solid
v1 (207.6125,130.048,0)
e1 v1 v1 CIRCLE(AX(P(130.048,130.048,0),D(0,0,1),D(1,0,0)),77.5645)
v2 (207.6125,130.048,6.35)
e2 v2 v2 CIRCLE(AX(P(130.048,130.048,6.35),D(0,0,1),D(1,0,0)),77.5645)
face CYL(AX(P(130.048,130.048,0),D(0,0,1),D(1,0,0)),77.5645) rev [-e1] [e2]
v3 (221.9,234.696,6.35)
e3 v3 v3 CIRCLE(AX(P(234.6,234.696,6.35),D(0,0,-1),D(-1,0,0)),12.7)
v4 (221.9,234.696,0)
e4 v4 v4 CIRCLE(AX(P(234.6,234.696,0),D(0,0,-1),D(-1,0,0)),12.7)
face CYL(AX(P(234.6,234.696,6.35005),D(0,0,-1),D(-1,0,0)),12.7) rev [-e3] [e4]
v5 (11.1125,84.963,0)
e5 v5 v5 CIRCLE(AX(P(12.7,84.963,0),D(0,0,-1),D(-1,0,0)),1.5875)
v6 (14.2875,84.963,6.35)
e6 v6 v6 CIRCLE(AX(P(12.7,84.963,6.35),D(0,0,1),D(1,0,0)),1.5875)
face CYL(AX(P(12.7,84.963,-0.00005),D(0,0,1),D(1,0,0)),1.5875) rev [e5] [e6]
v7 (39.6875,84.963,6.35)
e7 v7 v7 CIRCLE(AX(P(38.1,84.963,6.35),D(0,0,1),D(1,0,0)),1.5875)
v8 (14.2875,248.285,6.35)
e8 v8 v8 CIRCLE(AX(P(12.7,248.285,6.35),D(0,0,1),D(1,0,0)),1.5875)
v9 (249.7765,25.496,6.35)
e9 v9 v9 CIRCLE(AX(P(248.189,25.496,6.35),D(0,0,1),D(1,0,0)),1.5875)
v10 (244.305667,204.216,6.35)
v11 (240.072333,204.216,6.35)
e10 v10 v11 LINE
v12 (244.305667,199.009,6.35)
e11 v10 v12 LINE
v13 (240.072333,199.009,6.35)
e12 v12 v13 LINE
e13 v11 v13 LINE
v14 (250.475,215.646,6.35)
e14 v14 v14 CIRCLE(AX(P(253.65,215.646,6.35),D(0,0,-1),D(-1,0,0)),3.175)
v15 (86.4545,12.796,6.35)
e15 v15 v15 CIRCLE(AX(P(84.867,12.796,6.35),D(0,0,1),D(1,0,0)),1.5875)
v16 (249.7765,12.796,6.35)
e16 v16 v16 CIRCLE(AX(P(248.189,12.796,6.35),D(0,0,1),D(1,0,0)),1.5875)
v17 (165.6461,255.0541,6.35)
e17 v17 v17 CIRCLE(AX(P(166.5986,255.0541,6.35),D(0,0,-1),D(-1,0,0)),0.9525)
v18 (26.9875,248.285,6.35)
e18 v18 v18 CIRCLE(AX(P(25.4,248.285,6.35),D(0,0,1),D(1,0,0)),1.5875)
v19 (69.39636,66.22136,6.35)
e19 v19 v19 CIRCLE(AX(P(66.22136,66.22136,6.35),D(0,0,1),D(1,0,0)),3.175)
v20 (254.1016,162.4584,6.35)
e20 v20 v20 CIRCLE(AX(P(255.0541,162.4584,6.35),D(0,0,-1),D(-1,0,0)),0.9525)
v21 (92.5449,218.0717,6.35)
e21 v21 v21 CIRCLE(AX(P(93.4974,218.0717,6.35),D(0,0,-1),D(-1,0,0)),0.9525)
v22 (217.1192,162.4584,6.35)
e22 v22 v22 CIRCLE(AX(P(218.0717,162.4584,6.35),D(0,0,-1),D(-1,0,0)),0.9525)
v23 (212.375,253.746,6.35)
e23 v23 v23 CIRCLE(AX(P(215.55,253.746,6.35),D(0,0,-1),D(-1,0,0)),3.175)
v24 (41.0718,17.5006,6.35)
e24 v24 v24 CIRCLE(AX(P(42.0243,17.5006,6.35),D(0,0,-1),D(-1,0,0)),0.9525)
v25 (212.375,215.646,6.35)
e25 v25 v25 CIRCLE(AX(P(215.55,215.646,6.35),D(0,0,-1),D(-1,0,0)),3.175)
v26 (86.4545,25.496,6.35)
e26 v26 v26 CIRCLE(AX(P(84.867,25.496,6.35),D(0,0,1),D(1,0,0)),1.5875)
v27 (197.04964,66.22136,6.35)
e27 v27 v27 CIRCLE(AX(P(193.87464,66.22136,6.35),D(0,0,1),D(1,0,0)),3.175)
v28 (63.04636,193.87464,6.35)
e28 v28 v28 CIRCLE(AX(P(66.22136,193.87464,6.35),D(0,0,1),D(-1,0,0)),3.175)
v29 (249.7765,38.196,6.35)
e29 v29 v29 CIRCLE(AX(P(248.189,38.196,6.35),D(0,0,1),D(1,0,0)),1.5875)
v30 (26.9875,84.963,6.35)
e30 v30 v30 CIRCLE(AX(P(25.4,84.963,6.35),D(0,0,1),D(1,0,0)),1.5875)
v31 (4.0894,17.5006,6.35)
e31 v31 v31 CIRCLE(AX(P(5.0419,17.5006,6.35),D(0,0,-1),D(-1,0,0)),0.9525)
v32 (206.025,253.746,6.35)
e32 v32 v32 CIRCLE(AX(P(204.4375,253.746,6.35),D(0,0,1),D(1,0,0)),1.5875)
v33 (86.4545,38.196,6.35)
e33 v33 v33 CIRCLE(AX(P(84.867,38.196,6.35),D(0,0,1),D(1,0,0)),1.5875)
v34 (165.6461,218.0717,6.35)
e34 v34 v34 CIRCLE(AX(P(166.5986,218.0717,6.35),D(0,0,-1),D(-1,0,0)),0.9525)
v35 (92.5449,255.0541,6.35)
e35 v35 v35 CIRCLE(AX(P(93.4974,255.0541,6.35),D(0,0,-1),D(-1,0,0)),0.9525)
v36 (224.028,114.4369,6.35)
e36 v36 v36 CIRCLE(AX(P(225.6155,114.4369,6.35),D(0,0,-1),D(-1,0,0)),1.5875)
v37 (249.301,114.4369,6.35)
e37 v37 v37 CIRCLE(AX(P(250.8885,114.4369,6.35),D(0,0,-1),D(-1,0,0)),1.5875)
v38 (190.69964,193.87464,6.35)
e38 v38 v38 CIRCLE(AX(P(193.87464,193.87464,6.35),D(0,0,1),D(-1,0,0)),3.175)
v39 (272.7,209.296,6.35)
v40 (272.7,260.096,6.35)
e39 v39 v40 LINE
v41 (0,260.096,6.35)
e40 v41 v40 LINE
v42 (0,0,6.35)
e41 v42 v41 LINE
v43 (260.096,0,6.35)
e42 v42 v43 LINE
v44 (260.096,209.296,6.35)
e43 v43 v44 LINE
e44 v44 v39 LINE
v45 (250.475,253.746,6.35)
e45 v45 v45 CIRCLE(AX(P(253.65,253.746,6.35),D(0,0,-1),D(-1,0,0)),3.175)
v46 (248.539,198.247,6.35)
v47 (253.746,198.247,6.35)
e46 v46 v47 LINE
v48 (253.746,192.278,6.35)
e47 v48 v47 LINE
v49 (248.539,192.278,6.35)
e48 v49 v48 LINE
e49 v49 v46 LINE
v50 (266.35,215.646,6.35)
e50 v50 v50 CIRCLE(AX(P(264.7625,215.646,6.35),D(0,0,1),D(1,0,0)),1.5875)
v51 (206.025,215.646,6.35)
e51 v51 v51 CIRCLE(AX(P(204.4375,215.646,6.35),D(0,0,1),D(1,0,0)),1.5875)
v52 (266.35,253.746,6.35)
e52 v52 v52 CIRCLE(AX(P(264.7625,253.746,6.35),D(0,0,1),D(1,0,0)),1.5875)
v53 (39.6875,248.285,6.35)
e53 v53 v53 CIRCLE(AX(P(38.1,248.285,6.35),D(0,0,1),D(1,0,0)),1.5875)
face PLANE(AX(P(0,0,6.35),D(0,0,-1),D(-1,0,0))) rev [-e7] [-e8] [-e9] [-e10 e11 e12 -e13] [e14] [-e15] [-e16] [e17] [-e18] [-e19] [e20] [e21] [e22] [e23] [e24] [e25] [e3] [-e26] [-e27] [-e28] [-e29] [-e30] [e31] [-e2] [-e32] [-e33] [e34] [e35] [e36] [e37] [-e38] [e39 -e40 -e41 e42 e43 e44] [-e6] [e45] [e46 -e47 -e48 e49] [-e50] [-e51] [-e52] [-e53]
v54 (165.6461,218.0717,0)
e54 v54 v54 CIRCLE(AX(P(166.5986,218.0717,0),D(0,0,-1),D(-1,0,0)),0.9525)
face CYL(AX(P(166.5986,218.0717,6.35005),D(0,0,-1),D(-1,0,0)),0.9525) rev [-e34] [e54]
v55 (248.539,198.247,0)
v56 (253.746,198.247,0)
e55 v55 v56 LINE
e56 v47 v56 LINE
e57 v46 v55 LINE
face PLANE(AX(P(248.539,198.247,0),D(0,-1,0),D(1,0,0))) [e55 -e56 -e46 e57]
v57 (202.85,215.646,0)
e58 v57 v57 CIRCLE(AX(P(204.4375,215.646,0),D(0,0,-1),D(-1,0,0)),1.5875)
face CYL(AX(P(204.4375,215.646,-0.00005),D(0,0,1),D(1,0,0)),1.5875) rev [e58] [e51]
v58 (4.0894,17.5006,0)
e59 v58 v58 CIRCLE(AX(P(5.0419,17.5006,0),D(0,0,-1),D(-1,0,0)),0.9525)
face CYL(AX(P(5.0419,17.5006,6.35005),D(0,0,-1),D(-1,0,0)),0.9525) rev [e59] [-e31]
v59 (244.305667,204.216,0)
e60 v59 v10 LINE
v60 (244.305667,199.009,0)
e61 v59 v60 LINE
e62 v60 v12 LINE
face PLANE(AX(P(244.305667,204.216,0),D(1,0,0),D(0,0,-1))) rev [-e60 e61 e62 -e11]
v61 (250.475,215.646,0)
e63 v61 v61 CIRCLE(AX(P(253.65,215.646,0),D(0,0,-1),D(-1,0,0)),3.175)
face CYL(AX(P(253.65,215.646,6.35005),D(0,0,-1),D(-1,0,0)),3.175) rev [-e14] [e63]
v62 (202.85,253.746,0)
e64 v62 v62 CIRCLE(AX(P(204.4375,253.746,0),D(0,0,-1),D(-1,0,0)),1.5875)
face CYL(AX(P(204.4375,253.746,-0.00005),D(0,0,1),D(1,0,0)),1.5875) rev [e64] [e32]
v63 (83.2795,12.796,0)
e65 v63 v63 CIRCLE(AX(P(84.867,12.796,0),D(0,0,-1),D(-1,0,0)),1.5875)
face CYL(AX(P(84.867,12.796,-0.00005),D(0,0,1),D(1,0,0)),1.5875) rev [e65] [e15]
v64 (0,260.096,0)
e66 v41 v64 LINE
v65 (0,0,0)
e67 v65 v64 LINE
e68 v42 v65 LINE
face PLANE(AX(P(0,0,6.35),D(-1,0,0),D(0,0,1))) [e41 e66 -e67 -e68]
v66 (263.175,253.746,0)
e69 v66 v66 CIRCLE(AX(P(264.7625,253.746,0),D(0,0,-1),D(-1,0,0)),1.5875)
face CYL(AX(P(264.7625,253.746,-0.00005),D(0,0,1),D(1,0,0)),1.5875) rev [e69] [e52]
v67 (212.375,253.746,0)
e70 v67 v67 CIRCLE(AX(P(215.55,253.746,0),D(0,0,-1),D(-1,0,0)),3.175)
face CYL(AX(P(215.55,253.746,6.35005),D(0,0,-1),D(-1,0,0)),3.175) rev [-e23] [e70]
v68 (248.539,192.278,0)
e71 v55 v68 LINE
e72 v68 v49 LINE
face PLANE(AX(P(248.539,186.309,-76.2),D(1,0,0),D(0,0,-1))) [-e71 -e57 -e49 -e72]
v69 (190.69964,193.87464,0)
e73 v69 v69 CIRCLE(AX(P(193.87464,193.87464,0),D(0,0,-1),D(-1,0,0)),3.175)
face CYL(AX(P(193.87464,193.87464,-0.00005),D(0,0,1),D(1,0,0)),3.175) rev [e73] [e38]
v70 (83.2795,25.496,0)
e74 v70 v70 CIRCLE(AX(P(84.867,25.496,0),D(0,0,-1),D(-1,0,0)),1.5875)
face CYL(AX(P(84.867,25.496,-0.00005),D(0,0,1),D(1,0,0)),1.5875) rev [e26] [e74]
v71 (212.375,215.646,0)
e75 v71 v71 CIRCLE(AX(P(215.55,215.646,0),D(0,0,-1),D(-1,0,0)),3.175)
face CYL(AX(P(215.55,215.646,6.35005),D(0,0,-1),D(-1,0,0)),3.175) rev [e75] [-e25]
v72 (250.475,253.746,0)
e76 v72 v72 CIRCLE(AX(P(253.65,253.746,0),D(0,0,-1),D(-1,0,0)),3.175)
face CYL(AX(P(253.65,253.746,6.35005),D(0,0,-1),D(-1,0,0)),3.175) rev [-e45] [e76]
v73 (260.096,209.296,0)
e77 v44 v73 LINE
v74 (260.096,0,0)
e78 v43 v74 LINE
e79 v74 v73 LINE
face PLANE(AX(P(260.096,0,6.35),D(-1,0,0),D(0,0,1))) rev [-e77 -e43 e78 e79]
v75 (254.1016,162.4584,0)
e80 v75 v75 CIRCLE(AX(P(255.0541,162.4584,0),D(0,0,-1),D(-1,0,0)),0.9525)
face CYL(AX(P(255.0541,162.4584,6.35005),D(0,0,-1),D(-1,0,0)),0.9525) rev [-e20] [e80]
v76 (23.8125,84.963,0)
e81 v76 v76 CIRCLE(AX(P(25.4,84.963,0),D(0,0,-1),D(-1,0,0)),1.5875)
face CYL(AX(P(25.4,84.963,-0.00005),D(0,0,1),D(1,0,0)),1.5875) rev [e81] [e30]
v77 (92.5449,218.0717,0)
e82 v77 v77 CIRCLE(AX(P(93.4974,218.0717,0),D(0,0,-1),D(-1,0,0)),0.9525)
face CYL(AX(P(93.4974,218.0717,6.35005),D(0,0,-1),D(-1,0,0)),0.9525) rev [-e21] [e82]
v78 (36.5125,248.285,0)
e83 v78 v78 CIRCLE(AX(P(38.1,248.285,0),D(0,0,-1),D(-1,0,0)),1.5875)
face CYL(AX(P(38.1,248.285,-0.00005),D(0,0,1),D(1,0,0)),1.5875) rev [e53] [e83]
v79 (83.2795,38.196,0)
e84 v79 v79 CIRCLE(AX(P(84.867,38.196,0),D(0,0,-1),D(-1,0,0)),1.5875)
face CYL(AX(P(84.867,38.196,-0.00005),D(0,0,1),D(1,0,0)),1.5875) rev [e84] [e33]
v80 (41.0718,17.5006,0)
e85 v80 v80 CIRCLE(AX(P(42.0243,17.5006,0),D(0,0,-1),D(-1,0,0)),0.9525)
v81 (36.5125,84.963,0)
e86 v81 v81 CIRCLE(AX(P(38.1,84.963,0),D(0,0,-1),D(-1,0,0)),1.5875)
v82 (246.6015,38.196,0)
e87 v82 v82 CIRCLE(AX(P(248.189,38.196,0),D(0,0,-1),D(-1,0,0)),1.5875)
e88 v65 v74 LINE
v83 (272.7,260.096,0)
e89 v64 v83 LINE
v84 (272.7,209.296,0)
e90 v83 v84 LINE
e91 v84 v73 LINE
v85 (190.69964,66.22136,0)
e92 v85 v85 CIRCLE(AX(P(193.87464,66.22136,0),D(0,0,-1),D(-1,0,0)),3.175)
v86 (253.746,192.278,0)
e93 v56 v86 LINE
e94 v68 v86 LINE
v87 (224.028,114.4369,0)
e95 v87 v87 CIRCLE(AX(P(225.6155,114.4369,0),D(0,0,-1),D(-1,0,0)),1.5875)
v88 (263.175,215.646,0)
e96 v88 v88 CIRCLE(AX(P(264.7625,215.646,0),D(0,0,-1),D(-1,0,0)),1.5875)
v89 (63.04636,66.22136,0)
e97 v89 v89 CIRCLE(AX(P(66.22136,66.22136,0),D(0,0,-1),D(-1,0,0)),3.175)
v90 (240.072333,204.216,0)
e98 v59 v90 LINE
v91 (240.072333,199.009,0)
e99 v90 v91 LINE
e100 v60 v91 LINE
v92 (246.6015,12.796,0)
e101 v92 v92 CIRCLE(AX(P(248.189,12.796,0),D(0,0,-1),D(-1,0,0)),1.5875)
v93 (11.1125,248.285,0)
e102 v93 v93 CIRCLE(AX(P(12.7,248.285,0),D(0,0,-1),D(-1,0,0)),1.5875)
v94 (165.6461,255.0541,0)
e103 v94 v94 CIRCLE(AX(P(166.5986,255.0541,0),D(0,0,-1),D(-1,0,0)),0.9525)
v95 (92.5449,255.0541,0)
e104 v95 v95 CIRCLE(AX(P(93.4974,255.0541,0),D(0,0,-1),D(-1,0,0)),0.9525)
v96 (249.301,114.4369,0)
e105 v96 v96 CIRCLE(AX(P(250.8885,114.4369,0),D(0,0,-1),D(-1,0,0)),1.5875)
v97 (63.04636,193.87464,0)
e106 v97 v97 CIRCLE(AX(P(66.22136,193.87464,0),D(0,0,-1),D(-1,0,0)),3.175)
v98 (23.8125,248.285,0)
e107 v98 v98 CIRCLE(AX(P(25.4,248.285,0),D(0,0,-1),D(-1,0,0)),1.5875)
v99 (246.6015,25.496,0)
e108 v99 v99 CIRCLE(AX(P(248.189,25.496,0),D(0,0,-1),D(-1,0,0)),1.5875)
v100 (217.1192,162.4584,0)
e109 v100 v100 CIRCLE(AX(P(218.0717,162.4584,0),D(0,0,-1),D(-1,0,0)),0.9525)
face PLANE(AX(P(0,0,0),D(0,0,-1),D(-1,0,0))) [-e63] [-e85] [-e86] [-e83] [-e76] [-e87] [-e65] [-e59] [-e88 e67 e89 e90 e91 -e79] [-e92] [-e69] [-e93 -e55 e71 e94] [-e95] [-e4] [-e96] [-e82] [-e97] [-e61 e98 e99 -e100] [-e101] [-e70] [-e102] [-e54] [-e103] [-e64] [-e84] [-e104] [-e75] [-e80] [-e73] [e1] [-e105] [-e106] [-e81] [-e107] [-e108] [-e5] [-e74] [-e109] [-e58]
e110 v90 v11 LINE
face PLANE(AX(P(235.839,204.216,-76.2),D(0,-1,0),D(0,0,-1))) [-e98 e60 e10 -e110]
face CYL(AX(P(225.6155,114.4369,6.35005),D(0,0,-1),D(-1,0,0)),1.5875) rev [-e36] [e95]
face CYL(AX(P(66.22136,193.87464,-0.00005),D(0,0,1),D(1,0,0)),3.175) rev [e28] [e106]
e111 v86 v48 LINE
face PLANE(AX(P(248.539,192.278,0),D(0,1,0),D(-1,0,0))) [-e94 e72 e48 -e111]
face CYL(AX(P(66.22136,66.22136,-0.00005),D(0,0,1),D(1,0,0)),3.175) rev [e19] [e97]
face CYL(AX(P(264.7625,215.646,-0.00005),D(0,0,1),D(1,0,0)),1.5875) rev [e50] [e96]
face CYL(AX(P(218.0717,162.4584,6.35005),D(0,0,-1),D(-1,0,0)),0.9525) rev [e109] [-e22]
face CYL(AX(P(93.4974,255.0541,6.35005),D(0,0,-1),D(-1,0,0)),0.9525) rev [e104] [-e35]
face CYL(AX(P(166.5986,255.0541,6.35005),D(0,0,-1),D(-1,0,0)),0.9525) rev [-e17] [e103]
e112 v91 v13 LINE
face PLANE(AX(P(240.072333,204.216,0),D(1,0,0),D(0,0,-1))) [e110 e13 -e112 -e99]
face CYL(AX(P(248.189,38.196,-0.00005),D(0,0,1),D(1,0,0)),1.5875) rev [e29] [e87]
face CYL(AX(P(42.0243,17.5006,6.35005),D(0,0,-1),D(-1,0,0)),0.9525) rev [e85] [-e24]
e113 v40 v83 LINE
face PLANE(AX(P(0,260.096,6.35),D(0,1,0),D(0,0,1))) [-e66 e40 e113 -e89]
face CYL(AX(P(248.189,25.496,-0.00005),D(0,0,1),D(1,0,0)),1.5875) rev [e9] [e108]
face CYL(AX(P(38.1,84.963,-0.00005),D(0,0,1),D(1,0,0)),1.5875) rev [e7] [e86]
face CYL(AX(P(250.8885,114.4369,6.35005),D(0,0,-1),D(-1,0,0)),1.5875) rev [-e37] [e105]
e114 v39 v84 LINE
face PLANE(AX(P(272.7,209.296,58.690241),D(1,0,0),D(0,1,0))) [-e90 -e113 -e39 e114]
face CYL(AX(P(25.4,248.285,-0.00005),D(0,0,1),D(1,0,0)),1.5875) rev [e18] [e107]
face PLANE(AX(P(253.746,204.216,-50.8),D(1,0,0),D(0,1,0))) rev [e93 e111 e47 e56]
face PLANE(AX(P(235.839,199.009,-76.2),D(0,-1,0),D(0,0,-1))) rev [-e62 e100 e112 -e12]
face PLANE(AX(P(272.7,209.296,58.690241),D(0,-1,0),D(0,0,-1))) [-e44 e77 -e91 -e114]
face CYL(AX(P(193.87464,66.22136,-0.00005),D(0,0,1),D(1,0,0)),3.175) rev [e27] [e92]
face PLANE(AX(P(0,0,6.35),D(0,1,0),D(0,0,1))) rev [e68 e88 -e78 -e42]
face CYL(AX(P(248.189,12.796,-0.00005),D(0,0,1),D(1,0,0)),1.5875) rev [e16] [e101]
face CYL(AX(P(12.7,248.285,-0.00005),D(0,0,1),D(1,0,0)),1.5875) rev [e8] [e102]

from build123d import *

# Parameters (mm, degrees)
SKETCH1_W           = 260.096
SKETCH1_H           = 260.096
BOSS_EXTRUDE1_DEPTH = 6.35
SKETCH2_R           = 77.5645
CUT_EXTRUDE1_DEPTH  = 368.886097769
SKETCH3_W           = 12.604
SKETCH3_H           = 50.8
BOSS_EXTRUDE2_DEPTH = 6.35
SKETCH5_R           = 3.175
CUT_EXTRUDE2_DEPTH  = 377.902562629
SKETCH6_R           = 1.5875
CUT_EXTRUDE3_DEPTH  = 377.902562629
SKETCH7_R           = 1.5875
CUT_EXTRUDE4_DEPTH  = 377.902562629
SKETCH8_R           = 0.9525
CUT_EXTRUDE5_DEPTH  = 377.902562629
SKETCH9_R           = 12.7
CUT_EXTRUDE6_DEPTH  = 377.902562629
SKETCH10_R          = 3.175
CUT_EXTRUDE7_DEPTH  = 377.902562629
CAVITY1_START       = 248.539
CAVITY1_OUTLINE_W   = 5.969
CAVITY1_OUTLINE_H   = 6.35
CAVITY1_DEPTH       = 5.207
CAVITY1_START_2     = 240.072333333
CAVITY1_2_OUTLINE_W = 5.207
CAVITY1_2_OUTLINE_H = 6.35
CAVITY1_2_DEPTH     = 4.233333334
SKETCH11_R          = 1.5875
CUT_EXTRUDE8_DEPTH  = 377.902562629


# Read off the part's stored shape, not the designer's step: Cavity1
with BuildPart() as part:
    # Sketch1 → Boss-Extrude1 (new body)
    with BuildSketch(Plane.XY):
        with Locations((130.048, 130.048)):
            Rectangle(SKETCH1_W, SKETCH1_H)
    extrude(amount=BOSS_EXTRUDE1_DEPTH)

    # Sketch2 → Cut-Extrude1 (cut, through all)
    with BuildSketch(Plane.XY.offset(6.35)):
        with Locations((130.048, 130.048)):
            Circle(SKETCH2_R)
    extrude(amount=-CUT_EXTRUDE1_DEPTH, mode=Mode.SUBTRACT)

    # Sketch3 → Boss-Extrude2 (add)
    with BuildSketch(Plane(origin=(0, 0, 0), x_dir=(-1, 0, 0), z_dir=(0, 0, -1))):
        with Locations((-266.398, 234.696)):
            Rectangle(SKETCH3_W, SKETCH3_H)
    extrude(amount=-BOSS_EXTRUDE2_DEPTH)

    # Sketch5 → Cut-Extrude2 (cut, through all)
    with BuildSketch(Plane.XY.offset(6.35)):
        with Locations((193.87464005, 66.22135995)):
            Circle(SKETCH5_R)
        with Locations(Location((66.22135995, 193.87464005, 0), (0, 0, 180))):
            Circle(SKETCH5_R)
        with Locations(Location((193.87464005, 193.87464005, 0), (0, 0, 180))):
            Circle(SKETCH5_R)
        with Locations((66.22135995, 66.22135995)):
            Circle(SKETCH5_R)
    extrude(amount=-CUT_EXTRUDE2_DEPTH, mode=Mode.SUBTRACT)

    # Sketch6 → Cut-Extrude3 (cut, through all)
    with BuildSketch(Plane.XY.offset(6.35)):
        with Locations((264.7625, 253.746)):
            Circle(SKETCH6_R)
        with Locations((264.7625, 215.646)):
            Circle(SKETCH6_R)
        with Locations((204.4375, 253.746)):
            Circle(SKETCH6_R)
        with Locations((204.4375, 215.646)):
            Circle(SKETCH6_R)
    extrude(amount=-CUT_EXTRUDE3_DEPTH, mode=Mode.SUBTRACT)

    # Sketch7 → Cut-Extrude4 (cut, through all)
    with BuildSketch(Plane.XY.offset(6.35)):
        with Locations((248.189, 12.796)):
            Circle(SKETCH7_R)
        with Locations((248.189, 25.496)):
            Circle(SKETCH7_R)
        with Locations((248.189, 38.196)):
            Circle(SKETCH7_R)
        with Locations((84.867, 12.796)):
            Circle(SKETCH7_R)
        with Locations((84.867, 25.496)):
            Circle(SKETCH7_R)
        with Locations((84.867, 38.196)):
            Circle(SKETCH7_R)
        with Locations((12.7, 84.963)):
            Circle(SKETCH7_R)
        with Locations((25.4, 84.963)):
            Circle(SKETCH7_R)
        with Locations((38.1, 84.963)):
            Circle(SKETCH7_R)
        with Locations((38.1, 248.285)):
            Circle(SKETCH7_R)
        with Locations((25.4, 248.285)):
            Circle(SKETCH7_R)
        with Locations((12.7, 248.285)):
            Circle(SKETCH7_R)
    extrude(amount=-CUT_EXTRUDE4_DEPTH, mode=Mode.SUBTRACT)

    # Sketch8 → Cut-Extrude5 (cut, through all)
    with BuildSketch(Plane(origin=(0, 0, 0), x_dir=(-1, 0, 0), z_dir=(0, 0, -1))):
        with Locations((-255.0541, 162.4584)):
            Circle(SKETCH8_R)
        with Locations((-218.0717, 162.4584)):
            Circle(SKETCH8_R)
        with Locations((-166.5986, 218.0717)):
            Circle(SKETCH8_R)
        with Locations((-166.5986, 255.0541)):
            Circle(SKETCH8_R)
        with Locations((-93.4974, 218.0717)):
            Circle(SKETCH8_R)
        with Locations((-93.4974, 255.0541)):
            Circle(SKETCH8_R)
        with Locations((-5.0419, 17.5006)):
            Circle(SKETCH8_R)
        with Locations((-42.0243, 17.5006)):
            Circle(SKETCH8_R)
    extrude(amount=-CUT_EXTRUDE5_DEPTH, mode=Mode.SUBTRACT)

    # Sketch9 → Cut-Extrude6 (cut, through all)
    with BuildSketch(Plane(origin=(0, 0, 0), x_dir=(-1, 0, 0), z_dir=(0, 0, -1))):
        with Locations((-234.6, 234.696)):
            Circle(SKETCH9_R)
    extrude(amount=-CUT_EXTRUDE6_DEPTH, mode=Mode.SUBTRACT)

    # Sketch10 → Cut-Extrude7 (cut, through all)
    with BuildSketch(Plane(origin=(0, 0, 0), x_dir=(-1, 0, 0), z_dir=(0, 0, -1))):
        with Locations((-215.55, 253.746)):
            Circle(SKETCH10_R)
        with Locations((-215.55, 215.646)):
            Circle(SKETCH10_R)
        with Locations((-253.65, 253.746)):
            Circle(SKETCH10_R)
        with Locations((-253.65, 215.646)):
            Circle(SKETCH10_R)
    extrude(amount=-CUT_EXTRUDE7_DEPTH, mode=Mode.SUBTRACT)

    # Cavity1 outline → Cavity1 (cut)
    with BuildSketch(Plane.YZ.offset(CAVITY1_START)):
        with Locations((195.2625, 3.175)):
            Rectangle(CAVITY1_OUTLINE_W, CAVITY1_OUTLINE_H)
    extrude(amount=CAVITY1_DEPTH, mode=Mode.SUBTRACT)

    # Cavity1 2 outline → Cavity1 2 (cut)
    with BuildSketch(Plane.YZ.offset(CAVITY1_START_2)):
        with Locations((201.6125, 3.175)):
            Rectangle(CAVITY1_2_OUTLINE_W, CAVITY1_2_OUTLINE_H)
    extrude(amount=CAVITY1_2_DEPTH, mode=Mode.SUBTRACT)

    # Sketch11 → Cut-Extrude8 (cut, through all)
    with BuildSketch(Plane(origin=(0, 0, 0), x_dir=(-1, 0, 0), z_dir=(0, 0, -1))):
        with Locations((-225.6155, 114.4369)):
            Circle(SKETCH11_R)
        with Locations((-250.8885, 114.4369)):
            Circle(SKETCH11_R)
    extrude(amount=-CUT_EXTRUDE8_DEPTH, mode=Mode.SUBTRACT)


solid = part.part
